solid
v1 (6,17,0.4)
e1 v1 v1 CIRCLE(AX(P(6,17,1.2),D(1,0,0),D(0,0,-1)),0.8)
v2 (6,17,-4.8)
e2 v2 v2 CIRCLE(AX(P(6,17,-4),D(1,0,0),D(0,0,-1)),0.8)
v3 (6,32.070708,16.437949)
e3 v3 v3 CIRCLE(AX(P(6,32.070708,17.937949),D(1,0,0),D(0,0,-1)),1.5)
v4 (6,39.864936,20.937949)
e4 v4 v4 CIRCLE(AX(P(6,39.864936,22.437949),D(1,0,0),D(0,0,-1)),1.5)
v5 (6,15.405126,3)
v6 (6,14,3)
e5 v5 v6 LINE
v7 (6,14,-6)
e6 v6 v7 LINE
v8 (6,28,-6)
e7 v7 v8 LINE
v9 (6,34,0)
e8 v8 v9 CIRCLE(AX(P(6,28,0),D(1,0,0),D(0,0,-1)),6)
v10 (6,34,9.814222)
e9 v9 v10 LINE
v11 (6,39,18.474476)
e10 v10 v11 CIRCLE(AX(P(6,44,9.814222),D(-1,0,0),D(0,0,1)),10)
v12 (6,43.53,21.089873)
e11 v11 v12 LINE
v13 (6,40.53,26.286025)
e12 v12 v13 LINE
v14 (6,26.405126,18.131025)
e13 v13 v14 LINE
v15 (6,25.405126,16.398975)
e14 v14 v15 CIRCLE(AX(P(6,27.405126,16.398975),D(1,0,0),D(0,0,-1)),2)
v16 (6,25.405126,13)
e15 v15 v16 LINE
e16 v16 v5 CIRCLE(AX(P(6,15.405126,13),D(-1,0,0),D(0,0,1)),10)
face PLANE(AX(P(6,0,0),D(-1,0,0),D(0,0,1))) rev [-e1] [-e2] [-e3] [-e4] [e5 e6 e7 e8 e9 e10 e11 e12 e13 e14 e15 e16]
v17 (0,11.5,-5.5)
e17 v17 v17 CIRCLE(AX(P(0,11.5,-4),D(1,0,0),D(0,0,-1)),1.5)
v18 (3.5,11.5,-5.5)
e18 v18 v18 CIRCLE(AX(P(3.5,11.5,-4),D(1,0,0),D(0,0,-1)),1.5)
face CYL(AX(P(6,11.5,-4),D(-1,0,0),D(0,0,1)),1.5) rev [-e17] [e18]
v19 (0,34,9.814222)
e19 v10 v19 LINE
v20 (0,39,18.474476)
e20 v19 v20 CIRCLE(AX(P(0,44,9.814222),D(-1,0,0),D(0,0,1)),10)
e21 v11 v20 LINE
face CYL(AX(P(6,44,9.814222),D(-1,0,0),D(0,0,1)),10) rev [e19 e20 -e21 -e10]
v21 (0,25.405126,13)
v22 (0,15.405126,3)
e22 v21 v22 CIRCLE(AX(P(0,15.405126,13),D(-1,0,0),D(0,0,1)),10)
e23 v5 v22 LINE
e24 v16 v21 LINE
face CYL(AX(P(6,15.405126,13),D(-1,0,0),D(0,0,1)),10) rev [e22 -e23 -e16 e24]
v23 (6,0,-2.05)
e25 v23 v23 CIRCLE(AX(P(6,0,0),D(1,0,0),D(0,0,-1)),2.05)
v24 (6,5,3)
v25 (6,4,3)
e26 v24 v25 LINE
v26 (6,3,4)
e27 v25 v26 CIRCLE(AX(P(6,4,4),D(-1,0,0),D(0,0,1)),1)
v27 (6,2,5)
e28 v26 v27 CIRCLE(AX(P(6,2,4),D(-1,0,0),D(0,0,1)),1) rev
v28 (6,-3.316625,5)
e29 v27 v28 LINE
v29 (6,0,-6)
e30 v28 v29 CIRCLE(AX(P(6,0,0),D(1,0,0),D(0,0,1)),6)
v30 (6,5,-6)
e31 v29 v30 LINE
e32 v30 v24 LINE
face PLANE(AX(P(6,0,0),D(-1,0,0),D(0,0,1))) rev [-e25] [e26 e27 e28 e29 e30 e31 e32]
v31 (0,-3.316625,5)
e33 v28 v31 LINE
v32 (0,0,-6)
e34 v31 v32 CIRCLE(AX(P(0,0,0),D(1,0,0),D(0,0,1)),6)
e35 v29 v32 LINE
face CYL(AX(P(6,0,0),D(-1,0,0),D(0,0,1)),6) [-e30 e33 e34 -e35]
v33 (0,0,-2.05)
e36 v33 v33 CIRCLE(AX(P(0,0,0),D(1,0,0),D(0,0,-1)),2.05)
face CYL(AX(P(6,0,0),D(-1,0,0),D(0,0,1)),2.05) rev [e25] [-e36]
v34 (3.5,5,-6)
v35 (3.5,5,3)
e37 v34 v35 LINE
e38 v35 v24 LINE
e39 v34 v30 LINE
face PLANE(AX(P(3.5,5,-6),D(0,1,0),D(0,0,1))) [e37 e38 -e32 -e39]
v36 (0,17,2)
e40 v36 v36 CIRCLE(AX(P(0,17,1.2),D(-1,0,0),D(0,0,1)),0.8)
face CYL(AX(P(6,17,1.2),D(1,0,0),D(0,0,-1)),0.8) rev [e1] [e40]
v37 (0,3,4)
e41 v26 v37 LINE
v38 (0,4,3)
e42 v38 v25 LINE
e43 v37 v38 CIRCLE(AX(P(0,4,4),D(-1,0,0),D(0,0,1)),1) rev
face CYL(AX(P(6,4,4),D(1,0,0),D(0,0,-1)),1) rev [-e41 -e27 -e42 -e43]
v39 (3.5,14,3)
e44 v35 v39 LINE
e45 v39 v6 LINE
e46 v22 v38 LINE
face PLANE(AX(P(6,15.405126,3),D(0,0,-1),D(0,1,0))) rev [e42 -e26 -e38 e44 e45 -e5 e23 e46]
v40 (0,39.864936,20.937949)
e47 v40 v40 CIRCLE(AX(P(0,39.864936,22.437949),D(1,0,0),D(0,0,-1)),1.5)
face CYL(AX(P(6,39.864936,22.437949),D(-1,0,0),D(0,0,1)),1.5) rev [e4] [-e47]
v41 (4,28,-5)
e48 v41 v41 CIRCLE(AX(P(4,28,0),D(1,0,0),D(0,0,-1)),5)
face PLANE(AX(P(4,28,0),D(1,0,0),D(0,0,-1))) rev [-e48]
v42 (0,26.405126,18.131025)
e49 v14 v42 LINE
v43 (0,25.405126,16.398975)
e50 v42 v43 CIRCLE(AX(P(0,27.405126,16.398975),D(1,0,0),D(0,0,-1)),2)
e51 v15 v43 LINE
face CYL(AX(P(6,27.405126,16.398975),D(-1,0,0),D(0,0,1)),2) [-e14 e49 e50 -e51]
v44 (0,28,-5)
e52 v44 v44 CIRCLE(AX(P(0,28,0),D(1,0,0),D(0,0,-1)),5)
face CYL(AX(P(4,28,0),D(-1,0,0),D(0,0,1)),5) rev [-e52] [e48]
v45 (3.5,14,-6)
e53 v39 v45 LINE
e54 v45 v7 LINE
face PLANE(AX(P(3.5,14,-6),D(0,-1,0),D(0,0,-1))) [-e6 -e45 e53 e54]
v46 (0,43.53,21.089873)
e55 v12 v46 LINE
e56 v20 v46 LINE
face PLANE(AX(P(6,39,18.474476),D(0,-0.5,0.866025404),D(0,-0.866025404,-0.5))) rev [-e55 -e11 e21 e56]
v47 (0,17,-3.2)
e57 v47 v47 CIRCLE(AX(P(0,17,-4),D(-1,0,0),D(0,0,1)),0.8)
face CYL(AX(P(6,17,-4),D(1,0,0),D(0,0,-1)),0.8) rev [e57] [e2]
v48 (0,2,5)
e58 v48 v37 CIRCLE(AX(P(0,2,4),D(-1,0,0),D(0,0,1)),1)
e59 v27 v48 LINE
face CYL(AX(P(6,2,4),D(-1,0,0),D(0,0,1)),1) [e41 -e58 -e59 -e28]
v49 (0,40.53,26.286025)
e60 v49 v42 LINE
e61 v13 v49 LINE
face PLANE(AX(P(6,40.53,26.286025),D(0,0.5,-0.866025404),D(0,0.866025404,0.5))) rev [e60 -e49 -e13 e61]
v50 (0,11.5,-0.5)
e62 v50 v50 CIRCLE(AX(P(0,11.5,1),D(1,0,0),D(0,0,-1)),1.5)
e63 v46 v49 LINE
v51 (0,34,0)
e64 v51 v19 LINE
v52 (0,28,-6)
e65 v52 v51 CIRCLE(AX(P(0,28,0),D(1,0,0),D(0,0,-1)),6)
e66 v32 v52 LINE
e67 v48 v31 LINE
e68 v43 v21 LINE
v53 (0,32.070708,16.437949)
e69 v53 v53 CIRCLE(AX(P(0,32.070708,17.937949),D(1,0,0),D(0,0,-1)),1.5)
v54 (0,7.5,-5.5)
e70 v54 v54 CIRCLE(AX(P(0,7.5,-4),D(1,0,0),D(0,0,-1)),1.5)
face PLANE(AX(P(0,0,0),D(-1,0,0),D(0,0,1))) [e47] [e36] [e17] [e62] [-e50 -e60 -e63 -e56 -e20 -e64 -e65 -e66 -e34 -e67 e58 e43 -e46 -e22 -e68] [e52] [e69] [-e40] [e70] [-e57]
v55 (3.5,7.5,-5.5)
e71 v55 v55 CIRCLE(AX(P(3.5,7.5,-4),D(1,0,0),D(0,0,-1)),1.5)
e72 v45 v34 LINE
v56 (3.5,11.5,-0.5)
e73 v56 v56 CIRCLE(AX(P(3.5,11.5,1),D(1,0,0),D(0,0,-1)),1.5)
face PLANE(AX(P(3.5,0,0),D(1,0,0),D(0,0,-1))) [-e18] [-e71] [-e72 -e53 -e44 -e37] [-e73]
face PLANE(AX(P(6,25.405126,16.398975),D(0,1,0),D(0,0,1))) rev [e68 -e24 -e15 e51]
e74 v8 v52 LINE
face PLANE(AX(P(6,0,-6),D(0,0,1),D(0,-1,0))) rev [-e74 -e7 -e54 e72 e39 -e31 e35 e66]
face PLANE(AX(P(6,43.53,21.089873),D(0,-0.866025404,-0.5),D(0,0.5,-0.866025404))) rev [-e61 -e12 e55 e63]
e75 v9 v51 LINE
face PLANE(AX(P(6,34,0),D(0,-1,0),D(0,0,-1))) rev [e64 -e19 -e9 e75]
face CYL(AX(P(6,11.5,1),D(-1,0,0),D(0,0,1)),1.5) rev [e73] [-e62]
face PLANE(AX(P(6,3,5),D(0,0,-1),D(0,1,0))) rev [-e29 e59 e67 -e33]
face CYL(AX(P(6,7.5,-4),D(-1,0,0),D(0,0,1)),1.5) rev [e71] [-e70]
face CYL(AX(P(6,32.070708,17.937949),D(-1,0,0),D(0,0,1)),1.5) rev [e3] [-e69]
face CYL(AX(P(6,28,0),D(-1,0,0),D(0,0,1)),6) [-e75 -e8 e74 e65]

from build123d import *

# Parameters (mm, degrees)
SKETCH1_R                   = 2.05
SKETCH1_R_2                 = 1.5
BOSS_EXTRUDE1_DEPTH         = 6
FILLET1_START               = -1
FILLET1_DEPTH               = 8
FILLET1_2_DEPTH             = 6
TAP_DRILL_FOR_M2X0_4_TAP1_D = 1.6
SKETCH4_W                   = 9
SKETCH4_H                   = 9
CUT_EXTRUDE1_DEPTH          = 2.5
SKETCH5_R                   = 5
CUT_EXTRUDE2_DEPTH          = 4


with BuildPart() as part:
    # Sketch1 → Boss-Extrude1 (new body)
    with BuildSketch(Plane(origin=(0, 0, 0), x_dir=(0, 0, -1), z_dir=(1, 0, 0))):
        with BuildLine():
            Line((6, 0), (6, 28))
            ThreePointArc((6, 28), (4.242640687, 32.242640687), (0, 34))
            Line((0, 34), (-9.814222224, 34))
            ThreePointArc((-9.814222224, 34), (-14.814222224, 35.339745962), (-18.474476262, 39))
            Line((-18.474476262, 39), (-21.089872981, 43.53))
            Line((-21.089872981, 43.53), (-26.286025404, 40.53))
            Line((-26.286025404, 40.53), (-18.131025404, 26.405125664))
            ThreePointArc((-18.131025404, 26.405125664), (-17.398974596, 25.673074857), (-16.398974596, 25.405125664))
            Line((-16.398974596, 25.405125664), (-13, 25.405125664))
            ThreePointArc((-13, 25.405125664), (-5.928932188, 22.476193476), (-3, 15.405125664))
            Line((-3, 15.405125664), (-3, 3))
            Line((-3, 3), (-5, 3))
            Line((-5, 3), (-5, -3.31662479))
            ThreePointArc((-5, -3.31662479), (1.732050808, -5.744562647), (6, 0))
        make_face()
        Circle(SKETCH1_R, mode=Mode.SUBTRACT)
        with Locations((-22.437949192, 39.864936491)):
            Circle(SKETCH1_R_2, mode=Mode.SUBTRACT)
        with Locations((-17.937949192, 32.070707856)):
            Circle(SKETCH1_R_2, mode=Mode.SUBTRACT)
        with Locations((-1, 11.5)):
            Circle(SKETCH1_R_2, mode=Mode.SUBTRACT)
        with Locations((4, 11.5)):
            Circle(SKETCH1_R_2, mode=Mode.SUBTRACT)
        with Locations((4, 7.5)):
            Circle(SKETCH1_R_2, mode=Mode.SUBTRACT)
    extrude(amount=BOSS_EXTRUDE1_DEPTH)

    # Fillet1: read off the stored shape, not the designer's step
    # Fillet1 outline → Fillet1 (cut)
    with BuildSketch(Plane.YZ.offset(FILLET1_START)):
        with BuildLine():
            ThreePointArc((2, 5), (2.707106781, 4.707106781), (3, 4))
            Line((3, 4), (3, 5))
            Line((3, 5), (2, 5))
        make_face()
    extrude(amount=FILLET1_DEPTH, mode=Mode.SUBTRACT)

    # Fillet1 2 outline → Fillet1 2 (add)
    with BuildSketch(Plane.YZ):
        with BuildLine():
            ThreePointArc((4, 3), (3.292893219, 3.292893219), (3, 4))
            Line((3, 4), (3, 3))
            Line((3, 3), (4, 3))
        make_face()
    extrude(amount=FILLET1_2_DEPTH)

    # Tap Drill for M2x0.4 Tap1 (through all)
    with Locations(Plane(origin=(6, 0, 0), x_dir=(0, 0, -1), z_dir=(1, 0, 0))):
        with Locations((-1.2, 17), (4, 17)):
            Hole(TAP_DRILL_FOR_M2X0_4_TAP1_D / 2)

    # Sketch4 → Cut-Extrude1 (cut)
    with BuildSketch(Plane.ZY.offset(-6)):
        with Locations((-1.5, 9.5)):
            Rectangle(SKETCH4_W, SKETCH4_H)
    extrude(amount=CUT_EXTRUDE1_DEPTH, mode=Mode.SUBTRACT)

    # Sketch5 → Cut-Extrude2 (cut)
    with BuildSketch(Plane(origin=(0, 0, 0), x_dir=(0, 0, -1), z_dir=(1, 0, 0))):
        with Locations((0, 28)):
            Circle(SKETCH5_R)
    extrude(amount=CUT_EXTRUDE2_DEPTH, mode=Mode.SUBTRACT)


solid = part.part
